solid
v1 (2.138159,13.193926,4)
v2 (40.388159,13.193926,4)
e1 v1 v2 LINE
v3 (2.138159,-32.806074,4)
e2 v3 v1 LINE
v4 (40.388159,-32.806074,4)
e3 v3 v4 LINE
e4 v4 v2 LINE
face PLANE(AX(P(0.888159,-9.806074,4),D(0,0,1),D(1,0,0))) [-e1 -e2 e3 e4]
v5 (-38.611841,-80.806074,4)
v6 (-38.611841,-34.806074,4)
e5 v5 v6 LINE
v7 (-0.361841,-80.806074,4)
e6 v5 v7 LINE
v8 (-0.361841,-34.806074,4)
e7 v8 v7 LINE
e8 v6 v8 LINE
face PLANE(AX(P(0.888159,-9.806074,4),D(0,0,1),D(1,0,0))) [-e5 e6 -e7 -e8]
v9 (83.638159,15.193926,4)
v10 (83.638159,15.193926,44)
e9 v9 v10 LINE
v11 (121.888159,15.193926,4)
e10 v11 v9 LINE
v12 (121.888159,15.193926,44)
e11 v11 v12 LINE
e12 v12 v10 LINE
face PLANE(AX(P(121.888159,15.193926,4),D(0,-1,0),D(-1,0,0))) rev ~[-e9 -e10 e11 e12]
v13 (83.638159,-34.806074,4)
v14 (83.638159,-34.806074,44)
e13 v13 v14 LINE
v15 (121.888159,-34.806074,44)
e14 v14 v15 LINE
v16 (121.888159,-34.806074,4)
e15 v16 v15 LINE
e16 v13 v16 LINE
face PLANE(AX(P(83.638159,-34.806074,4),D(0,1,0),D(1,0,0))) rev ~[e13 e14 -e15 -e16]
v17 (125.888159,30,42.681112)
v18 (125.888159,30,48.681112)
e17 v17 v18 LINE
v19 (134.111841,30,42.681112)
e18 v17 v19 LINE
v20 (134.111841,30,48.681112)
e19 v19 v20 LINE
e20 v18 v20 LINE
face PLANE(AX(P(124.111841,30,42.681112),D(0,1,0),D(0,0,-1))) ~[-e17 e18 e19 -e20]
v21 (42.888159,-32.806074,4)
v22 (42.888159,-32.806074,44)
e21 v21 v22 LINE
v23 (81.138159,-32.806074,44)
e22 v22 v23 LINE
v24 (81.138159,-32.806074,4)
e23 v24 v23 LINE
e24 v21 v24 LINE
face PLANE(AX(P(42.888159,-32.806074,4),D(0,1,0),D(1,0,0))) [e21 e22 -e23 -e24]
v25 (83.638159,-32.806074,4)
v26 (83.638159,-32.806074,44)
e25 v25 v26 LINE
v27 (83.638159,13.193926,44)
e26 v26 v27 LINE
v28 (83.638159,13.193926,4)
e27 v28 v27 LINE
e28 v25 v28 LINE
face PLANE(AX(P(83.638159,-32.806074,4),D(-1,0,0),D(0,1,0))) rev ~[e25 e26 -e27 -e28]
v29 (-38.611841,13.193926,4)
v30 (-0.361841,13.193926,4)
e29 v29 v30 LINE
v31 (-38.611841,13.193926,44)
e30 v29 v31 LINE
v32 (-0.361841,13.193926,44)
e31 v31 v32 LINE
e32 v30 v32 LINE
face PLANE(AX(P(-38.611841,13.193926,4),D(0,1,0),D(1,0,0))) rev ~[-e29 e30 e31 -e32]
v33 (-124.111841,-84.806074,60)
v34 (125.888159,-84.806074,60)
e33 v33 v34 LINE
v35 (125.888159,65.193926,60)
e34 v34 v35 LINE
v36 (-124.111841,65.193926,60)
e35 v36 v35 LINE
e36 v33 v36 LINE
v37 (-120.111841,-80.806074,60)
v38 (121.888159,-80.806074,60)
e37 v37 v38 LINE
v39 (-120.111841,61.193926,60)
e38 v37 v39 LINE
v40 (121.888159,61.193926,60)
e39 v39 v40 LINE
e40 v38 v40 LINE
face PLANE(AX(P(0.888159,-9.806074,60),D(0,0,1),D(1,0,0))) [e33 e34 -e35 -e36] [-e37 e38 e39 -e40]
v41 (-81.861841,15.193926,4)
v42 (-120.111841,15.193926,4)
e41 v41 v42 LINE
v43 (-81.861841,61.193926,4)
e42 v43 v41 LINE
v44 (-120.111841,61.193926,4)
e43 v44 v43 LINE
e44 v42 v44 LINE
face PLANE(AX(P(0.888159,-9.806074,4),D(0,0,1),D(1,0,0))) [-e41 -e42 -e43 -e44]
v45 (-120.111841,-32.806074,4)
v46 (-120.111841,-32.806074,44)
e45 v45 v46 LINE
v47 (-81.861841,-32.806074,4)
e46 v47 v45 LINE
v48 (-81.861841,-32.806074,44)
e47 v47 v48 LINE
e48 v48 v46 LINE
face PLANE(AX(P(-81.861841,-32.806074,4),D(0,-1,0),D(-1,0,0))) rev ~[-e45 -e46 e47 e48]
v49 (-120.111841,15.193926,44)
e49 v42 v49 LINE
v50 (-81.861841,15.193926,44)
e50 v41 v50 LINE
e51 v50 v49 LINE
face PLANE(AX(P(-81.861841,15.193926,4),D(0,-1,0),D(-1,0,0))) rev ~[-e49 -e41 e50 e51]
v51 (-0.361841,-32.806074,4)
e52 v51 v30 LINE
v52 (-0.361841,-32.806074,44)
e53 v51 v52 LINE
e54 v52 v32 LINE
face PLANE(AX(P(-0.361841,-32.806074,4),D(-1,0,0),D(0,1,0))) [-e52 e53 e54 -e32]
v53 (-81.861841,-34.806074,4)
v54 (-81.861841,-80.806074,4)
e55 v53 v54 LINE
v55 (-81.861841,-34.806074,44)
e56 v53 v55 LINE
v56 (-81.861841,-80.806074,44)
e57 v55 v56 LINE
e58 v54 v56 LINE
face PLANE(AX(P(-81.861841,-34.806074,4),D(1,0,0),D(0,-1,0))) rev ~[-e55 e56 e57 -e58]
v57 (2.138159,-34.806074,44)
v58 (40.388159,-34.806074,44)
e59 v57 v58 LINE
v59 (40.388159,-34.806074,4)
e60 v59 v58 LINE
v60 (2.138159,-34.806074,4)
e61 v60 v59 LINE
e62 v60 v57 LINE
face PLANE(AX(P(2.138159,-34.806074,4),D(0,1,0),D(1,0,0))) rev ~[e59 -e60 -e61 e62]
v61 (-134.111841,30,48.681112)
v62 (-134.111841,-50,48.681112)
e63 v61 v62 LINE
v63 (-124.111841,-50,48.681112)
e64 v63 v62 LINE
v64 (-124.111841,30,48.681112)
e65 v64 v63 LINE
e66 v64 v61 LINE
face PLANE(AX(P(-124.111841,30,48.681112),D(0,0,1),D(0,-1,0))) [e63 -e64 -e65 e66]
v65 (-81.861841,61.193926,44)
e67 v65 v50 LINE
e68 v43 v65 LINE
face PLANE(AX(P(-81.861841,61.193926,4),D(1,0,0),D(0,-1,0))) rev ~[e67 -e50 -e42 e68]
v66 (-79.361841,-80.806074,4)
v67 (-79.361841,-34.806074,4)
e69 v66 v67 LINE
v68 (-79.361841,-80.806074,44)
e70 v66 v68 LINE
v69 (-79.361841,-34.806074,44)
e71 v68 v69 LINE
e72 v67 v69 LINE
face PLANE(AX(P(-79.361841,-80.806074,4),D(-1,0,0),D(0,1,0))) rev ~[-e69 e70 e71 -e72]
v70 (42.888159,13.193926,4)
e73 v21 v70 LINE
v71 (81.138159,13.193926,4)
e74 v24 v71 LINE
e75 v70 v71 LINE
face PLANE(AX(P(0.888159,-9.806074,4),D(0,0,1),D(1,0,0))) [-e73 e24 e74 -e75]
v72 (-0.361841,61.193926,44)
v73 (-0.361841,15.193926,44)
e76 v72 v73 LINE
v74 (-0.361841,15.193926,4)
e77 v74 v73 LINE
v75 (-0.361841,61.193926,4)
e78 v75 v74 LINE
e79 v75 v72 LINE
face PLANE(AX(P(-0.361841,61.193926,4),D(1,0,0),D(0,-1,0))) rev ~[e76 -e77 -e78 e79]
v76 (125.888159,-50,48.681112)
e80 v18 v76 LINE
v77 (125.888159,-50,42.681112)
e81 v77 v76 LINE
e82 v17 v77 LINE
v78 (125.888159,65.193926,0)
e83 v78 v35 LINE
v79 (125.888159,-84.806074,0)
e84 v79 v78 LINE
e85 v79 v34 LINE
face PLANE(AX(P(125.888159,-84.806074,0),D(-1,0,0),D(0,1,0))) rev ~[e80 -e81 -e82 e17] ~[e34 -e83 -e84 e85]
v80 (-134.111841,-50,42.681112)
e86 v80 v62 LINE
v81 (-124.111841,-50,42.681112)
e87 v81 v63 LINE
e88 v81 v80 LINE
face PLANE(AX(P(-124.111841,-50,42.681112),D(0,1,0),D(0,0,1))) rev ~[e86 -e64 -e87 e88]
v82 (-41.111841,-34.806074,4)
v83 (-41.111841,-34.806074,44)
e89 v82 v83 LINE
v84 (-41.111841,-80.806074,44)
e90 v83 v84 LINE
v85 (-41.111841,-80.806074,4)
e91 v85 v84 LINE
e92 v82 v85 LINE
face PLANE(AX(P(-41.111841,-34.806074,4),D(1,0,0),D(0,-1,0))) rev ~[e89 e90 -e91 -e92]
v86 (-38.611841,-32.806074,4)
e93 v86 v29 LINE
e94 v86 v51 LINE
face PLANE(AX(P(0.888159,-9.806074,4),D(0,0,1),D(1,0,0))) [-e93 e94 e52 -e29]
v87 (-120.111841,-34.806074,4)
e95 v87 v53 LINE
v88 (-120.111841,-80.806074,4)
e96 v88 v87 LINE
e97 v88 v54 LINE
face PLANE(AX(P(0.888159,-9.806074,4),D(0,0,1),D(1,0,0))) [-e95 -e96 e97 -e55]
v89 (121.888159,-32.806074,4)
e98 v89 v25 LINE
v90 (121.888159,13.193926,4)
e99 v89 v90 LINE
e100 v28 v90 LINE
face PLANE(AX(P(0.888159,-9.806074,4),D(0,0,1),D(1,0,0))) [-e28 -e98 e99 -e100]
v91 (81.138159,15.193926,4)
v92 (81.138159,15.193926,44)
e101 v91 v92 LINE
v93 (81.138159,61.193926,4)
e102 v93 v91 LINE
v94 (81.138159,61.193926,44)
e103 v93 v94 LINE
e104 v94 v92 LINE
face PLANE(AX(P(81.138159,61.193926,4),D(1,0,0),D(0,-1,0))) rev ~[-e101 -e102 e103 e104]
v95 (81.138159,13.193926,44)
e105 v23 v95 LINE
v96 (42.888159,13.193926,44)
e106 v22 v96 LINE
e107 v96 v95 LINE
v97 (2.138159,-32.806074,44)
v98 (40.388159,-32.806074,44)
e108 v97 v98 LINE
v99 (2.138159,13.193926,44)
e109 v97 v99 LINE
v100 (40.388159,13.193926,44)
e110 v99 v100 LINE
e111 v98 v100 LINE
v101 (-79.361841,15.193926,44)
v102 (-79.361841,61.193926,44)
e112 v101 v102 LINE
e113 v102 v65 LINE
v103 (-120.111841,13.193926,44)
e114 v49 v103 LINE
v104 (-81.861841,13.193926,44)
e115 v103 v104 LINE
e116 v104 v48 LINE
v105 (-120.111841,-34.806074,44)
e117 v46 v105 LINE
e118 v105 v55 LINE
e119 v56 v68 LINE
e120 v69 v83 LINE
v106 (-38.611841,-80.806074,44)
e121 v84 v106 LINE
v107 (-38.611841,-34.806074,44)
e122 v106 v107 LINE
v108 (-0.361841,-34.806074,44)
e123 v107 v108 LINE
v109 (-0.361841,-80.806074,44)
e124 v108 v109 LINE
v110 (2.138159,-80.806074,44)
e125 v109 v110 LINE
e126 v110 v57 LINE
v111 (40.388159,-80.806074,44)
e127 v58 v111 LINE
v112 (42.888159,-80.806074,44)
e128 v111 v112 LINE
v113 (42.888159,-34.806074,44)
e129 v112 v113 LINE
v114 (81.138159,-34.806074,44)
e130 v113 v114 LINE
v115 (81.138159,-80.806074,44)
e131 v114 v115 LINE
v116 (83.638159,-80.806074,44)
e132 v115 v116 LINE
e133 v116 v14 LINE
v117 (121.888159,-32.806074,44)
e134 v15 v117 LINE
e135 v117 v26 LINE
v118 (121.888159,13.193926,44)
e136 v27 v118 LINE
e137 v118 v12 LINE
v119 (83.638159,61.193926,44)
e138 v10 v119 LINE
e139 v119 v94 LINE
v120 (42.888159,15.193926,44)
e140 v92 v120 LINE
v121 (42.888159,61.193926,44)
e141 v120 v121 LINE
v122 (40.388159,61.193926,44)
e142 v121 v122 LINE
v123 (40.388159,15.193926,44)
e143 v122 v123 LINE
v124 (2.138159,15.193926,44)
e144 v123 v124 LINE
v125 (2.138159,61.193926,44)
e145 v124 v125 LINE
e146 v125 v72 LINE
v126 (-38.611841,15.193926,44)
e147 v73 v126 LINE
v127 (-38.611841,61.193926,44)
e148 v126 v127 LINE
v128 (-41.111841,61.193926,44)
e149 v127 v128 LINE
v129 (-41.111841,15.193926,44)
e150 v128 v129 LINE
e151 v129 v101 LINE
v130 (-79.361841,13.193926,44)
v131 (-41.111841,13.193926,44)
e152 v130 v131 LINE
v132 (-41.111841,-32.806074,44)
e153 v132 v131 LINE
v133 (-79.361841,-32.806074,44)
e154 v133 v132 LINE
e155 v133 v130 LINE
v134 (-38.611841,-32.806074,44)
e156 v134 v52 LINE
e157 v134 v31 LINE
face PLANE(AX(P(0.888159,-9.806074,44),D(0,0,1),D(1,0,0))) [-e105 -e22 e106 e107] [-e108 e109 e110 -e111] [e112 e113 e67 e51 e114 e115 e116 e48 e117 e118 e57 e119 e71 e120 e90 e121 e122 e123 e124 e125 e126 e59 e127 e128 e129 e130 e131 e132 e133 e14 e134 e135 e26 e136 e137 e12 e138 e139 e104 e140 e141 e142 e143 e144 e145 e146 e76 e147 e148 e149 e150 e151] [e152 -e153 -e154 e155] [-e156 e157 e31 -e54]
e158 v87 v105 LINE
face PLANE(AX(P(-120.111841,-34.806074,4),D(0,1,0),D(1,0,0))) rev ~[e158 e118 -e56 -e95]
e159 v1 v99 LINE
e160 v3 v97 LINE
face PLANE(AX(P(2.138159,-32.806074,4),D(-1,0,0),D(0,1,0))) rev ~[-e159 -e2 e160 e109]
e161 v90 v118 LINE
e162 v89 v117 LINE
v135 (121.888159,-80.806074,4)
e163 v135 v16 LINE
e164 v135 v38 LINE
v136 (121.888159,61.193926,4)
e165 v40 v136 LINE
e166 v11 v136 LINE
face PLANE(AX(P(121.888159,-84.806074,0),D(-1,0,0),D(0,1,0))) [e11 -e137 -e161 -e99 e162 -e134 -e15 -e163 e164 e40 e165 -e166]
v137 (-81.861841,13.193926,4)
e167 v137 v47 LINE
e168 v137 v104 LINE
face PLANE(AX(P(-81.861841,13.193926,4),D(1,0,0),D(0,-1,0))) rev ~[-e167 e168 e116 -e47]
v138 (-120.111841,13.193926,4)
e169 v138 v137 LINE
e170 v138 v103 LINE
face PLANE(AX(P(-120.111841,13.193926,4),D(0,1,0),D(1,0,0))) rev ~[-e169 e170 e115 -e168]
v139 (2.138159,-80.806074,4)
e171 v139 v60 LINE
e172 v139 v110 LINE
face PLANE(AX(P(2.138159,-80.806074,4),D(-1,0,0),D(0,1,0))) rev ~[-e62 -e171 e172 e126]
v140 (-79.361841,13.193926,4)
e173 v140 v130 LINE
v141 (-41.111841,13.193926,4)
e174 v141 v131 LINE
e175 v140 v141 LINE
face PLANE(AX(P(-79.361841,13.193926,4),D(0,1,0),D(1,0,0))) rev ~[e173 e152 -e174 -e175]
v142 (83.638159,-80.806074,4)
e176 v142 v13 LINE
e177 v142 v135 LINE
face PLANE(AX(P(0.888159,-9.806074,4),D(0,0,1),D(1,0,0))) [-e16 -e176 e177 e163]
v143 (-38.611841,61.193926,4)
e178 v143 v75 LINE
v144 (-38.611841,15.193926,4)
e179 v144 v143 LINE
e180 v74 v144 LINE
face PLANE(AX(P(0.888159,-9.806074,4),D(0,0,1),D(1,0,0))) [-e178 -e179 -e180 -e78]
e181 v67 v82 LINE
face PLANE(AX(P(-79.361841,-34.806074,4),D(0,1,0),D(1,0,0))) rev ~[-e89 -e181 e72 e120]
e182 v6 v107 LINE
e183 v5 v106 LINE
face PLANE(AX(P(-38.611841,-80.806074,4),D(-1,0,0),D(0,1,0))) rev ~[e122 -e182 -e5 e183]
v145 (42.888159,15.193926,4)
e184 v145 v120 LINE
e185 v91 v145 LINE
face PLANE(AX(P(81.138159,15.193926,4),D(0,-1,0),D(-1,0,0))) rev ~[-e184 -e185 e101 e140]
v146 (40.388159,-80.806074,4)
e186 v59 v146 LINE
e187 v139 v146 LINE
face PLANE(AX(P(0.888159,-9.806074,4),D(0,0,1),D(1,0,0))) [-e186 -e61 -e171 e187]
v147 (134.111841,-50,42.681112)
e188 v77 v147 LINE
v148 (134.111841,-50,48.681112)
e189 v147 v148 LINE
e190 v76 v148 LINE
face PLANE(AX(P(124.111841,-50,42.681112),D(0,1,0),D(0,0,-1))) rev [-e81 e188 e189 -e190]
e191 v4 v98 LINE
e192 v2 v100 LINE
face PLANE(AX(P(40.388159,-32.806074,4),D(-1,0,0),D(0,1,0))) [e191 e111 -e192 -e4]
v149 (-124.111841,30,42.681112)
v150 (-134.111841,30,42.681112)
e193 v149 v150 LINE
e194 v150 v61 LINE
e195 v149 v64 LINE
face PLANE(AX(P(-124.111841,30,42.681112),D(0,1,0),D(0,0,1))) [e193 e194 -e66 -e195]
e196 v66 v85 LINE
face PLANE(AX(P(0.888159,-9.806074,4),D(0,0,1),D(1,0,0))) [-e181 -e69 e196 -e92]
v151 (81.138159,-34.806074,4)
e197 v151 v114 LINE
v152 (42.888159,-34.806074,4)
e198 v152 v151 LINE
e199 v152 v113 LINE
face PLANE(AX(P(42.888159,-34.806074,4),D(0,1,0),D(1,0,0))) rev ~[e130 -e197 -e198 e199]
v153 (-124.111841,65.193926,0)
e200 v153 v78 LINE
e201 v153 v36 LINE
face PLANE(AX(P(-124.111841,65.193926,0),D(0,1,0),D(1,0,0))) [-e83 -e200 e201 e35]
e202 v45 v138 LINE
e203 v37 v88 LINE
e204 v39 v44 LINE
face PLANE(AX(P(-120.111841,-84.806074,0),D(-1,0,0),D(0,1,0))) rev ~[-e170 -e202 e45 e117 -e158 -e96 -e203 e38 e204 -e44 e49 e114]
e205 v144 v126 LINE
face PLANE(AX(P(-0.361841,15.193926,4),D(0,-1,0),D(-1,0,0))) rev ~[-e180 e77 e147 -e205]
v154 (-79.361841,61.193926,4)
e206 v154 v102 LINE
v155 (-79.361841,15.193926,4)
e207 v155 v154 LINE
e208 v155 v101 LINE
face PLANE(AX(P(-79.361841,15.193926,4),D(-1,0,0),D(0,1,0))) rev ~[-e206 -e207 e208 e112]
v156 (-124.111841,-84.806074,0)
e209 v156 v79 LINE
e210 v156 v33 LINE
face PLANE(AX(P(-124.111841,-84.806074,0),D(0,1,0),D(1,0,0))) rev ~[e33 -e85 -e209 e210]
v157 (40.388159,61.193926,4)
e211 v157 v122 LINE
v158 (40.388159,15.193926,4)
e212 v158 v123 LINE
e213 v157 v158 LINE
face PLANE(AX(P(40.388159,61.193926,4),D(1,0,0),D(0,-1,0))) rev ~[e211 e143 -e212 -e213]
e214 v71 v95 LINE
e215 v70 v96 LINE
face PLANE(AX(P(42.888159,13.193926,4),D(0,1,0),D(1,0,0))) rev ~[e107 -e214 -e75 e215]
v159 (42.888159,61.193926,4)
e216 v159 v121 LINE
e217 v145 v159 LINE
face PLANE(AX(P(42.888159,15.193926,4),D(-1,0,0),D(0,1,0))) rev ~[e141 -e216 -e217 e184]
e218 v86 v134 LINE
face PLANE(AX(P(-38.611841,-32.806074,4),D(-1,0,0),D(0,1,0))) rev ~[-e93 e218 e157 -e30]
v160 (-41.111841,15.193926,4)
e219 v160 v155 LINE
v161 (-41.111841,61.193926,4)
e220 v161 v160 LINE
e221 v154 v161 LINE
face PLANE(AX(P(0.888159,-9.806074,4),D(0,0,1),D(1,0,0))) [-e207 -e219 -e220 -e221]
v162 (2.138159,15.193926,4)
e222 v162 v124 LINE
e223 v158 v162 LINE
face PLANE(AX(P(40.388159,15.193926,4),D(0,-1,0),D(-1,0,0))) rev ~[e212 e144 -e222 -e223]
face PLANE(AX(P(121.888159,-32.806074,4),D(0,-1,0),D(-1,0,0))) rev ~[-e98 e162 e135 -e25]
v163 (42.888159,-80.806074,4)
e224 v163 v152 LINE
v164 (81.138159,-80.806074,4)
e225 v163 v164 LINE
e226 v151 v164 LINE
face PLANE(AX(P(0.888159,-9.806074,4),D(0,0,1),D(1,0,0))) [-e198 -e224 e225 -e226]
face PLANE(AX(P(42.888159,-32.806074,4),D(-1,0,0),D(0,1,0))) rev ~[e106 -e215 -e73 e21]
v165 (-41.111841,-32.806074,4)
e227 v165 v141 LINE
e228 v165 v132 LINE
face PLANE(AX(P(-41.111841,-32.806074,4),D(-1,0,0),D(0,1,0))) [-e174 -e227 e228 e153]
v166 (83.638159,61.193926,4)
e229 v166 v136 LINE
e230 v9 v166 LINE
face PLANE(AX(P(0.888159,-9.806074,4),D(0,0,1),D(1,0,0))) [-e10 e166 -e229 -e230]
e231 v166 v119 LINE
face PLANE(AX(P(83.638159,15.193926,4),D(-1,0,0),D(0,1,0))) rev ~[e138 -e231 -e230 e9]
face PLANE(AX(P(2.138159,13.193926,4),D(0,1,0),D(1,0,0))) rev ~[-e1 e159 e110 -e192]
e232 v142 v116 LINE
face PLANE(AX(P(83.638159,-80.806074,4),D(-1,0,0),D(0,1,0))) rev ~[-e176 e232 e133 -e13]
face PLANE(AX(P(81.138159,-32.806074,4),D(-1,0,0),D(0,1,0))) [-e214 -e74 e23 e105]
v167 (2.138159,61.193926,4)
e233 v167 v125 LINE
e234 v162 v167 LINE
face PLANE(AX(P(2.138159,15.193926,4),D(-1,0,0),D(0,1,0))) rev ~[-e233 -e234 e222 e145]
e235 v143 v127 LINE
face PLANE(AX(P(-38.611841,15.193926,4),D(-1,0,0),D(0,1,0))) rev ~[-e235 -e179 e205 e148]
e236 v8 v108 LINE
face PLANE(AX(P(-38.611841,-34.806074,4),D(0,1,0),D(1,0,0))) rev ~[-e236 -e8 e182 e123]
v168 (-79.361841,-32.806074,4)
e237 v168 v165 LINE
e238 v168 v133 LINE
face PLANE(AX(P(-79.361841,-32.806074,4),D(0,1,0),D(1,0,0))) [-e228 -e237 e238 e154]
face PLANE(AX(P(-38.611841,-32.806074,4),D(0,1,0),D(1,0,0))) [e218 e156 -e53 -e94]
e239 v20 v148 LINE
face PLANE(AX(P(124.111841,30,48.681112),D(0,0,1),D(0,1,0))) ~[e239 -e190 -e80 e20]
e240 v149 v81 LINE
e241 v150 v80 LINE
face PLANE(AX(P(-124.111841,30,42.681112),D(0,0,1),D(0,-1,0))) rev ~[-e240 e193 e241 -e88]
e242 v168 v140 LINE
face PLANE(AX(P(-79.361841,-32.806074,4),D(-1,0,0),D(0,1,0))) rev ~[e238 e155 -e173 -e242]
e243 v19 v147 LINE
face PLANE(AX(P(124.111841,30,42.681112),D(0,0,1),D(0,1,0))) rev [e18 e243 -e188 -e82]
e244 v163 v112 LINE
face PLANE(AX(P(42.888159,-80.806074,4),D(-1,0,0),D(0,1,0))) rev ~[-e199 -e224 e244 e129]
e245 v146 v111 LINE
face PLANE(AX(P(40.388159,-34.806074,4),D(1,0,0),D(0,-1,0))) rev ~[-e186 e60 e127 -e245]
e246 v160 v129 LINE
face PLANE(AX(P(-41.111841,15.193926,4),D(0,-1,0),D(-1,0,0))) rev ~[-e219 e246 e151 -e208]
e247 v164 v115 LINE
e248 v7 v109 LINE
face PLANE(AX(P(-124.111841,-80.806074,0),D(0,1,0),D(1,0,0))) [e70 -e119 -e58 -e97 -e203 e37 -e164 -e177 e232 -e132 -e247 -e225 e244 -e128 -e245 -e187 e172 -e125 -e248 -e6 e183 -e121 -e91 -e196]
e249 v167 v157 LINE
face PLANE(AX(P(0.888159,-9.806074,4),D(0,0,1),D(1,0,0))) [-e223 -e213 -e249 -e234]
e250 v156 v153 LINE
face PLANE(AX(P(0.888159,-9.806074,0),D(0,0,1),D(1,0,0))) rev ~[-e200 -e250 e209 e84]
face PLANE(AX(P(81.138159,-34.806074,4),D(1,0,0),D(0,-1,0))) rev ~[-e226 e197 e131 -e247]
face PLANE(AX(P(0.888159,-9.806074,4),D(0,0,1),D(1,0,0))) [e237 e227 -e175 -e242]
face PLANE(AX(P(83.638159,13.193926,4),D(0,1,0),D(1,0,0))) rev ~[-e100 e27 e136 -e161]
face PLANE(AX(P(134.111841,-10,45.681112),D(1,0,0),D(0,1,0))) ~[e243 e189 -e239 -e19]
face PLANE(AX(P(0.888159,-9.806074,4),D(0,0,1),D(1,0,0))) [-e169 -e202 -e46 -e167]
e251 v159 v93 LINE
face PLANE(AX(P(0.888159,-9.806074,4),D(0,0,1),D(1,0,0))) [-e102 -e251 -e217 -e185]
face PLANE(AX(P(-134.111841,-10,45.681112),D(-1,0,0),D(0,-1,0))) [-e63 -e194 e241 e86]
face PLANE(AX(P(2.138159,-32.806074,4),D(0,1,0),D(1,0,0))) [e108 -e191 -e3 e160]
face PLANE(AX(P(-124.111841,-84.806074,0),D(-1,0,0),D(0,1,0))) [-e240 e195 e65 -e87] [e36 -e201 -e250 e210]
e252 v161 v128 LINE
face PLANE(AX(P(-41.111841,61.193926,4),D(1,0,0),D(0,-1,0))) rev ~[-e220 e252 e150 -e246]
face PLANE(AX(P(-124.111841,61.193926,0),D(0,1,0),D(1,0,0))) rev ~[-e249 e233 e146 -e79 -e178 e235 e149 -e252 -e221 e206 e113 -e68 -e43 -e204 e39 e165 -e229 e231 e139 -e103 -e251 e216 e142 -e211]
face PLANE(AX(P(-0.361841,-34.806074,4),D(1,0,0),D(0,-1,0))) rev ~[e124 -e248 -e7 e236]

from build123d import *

# Parameters (mm, degrees)
F0_W     = 250
F0_H     = 150
F1_DEPTH = 60
F2_T     = -4
F3_W     = 38.25
F3_H     = 46
F4_DEPTH = 40
F5_W     = 80
F5_H     = 6
F6_DEPTH = 10


# Not quite as in the source:
# - a pattern or mirror of a feature is missing from the dataset's text; its kind, count and spacing are read off the source's solid


with BuildPart() as f1:
    # F0 (on Top) → F1 (new body)
    with BuildSketch(Plane.XY):
        with Locations((0.8881594986, -9.8060739803)):
            Rectangle(F0_W, F0_H)
    extrude(amount=F1_DEPTH)

    # F2
    f2_openings = [f1.faces().sort_by_distance(p)[0] for p in [
        (0.888159, -9.806074, 60),
    ]]
    offset(amount=F2_T, openings=f2_openings)

    # F3 (on face) → F4 (join)
    with BuildSketch(Plane.XY.offset(4)):
        Polygon((-81.8618405014, 15.1939260197), (-120.1118405014, 15.1939260197), (-120.1118405014, 13.1939260197), (-81.8618405014, 13.1939260197), (-81.8618405014, -32.8060739803), (-120.1118405014, -32.8060739803), (-120.1118405014, -34.8060739803), (-81.8618405014, -34.8060739803), (-81.8618405014, -80.8060739803), (-79.3618405014, -80.8060739803), (-79.3618405014, -34.8060739803), (-41.1118405014, -34.8060739803), (-41.1118405014, -80.8060739803), (-38.6118405014, -80.8060739803), (-38.6118405014, -34.8060739803), (-0.3618405014, -34.8060739803), (-0.3618405014, -80.8060739803), (2.1381594986, -80.8060739803), (2.1381594986, -34.8060739803), (40.3881594986, -34.8060739803), (40.3881594986, -80.8060739803), (42.8881594986, -80.8060739803), (42.8881594986, -34.8060739803), (81.1381594986, -34.8060739803), (81.1381594986, -80.8060739803), (83.6381594986, -80.8060739803), (83.6381594986, -34.8060739803), (121.8881594986, -34.8060739803), (121.8881594986, -32.8060739803), (83.6381594986, -32.8060739803), (83.6381594986, 13.1939260197), (121.8881594986, 13.1939260197), (121.8881594986, 15.1939260197), (83.6381594986, 15.1939260197), (83.6381594986, 61.1939260197), (81.1381594986, 61.1939260197), (81.1381594986, 15.1939260197), (42.8881594986, 15.1939260197), (42.8881594986, 61.1939260197), (40.3881594986, 61.1939260197), (40.3881594986, 15.1939260197), (2.1510550287, 15.1939260197), (2.1381594986, 15.1939260197), (2.1381594986, 61.1939260197), (-0.3618405014, 61.1939260197), (-0.3618405014, 15.1939260197), (-38.6118405014, 15.1939260197), (-38.6118405014, 61.1939260197), (-41.1118405014, 61.1939260197), (-41.1118405014, 15.1939260197), (-79.3618405014, 15.1939260197), (-79.3618405014, 61.1939260197), (-81.8618405014, 61.1939260197), align=None)
        with Locations((-60.2368405014, -9.8060739803)):
            Rectangle(F3_W, F3_H, mode=Mode.SUBTRACT)
        with Locations((-19.4868405014, -9.8060739803)):
            Rectangle(F3_W, F3_H, mode=Mode.SUBTRACT)
        with Locations((21.2631594986, -9.8060739803)):
            Rectangle(F3_W, F3_H, mode=Mode.SUBTRACT)
        with Locations((62.0131594986, -9.8060739803)):
            Rectangle(F3_W, F3_H, mode=Mode.SUBTRACT)
    extrude(amount=F4_DEPTH)

    # F5 (on face) → F6 (join)
    with BuildSketch(Plane(origin=(-124.1118405014, 0, 0), x_dir=(0, -1, 0), z_dir=(-1, 0, 0))):
        with Locations((10, 45.6811115146)):
            Rectangle(F5_W, F5_H)
    f6 = extrude(amount=F6_DEPTH)

    # F6_copies: F6 across plane
    add(f6.mirror(Plane(origin=(0, 0, 0), x_dir=(0, 0, 1), z_dir=(1, 0, 0))))


solid = f1.part
